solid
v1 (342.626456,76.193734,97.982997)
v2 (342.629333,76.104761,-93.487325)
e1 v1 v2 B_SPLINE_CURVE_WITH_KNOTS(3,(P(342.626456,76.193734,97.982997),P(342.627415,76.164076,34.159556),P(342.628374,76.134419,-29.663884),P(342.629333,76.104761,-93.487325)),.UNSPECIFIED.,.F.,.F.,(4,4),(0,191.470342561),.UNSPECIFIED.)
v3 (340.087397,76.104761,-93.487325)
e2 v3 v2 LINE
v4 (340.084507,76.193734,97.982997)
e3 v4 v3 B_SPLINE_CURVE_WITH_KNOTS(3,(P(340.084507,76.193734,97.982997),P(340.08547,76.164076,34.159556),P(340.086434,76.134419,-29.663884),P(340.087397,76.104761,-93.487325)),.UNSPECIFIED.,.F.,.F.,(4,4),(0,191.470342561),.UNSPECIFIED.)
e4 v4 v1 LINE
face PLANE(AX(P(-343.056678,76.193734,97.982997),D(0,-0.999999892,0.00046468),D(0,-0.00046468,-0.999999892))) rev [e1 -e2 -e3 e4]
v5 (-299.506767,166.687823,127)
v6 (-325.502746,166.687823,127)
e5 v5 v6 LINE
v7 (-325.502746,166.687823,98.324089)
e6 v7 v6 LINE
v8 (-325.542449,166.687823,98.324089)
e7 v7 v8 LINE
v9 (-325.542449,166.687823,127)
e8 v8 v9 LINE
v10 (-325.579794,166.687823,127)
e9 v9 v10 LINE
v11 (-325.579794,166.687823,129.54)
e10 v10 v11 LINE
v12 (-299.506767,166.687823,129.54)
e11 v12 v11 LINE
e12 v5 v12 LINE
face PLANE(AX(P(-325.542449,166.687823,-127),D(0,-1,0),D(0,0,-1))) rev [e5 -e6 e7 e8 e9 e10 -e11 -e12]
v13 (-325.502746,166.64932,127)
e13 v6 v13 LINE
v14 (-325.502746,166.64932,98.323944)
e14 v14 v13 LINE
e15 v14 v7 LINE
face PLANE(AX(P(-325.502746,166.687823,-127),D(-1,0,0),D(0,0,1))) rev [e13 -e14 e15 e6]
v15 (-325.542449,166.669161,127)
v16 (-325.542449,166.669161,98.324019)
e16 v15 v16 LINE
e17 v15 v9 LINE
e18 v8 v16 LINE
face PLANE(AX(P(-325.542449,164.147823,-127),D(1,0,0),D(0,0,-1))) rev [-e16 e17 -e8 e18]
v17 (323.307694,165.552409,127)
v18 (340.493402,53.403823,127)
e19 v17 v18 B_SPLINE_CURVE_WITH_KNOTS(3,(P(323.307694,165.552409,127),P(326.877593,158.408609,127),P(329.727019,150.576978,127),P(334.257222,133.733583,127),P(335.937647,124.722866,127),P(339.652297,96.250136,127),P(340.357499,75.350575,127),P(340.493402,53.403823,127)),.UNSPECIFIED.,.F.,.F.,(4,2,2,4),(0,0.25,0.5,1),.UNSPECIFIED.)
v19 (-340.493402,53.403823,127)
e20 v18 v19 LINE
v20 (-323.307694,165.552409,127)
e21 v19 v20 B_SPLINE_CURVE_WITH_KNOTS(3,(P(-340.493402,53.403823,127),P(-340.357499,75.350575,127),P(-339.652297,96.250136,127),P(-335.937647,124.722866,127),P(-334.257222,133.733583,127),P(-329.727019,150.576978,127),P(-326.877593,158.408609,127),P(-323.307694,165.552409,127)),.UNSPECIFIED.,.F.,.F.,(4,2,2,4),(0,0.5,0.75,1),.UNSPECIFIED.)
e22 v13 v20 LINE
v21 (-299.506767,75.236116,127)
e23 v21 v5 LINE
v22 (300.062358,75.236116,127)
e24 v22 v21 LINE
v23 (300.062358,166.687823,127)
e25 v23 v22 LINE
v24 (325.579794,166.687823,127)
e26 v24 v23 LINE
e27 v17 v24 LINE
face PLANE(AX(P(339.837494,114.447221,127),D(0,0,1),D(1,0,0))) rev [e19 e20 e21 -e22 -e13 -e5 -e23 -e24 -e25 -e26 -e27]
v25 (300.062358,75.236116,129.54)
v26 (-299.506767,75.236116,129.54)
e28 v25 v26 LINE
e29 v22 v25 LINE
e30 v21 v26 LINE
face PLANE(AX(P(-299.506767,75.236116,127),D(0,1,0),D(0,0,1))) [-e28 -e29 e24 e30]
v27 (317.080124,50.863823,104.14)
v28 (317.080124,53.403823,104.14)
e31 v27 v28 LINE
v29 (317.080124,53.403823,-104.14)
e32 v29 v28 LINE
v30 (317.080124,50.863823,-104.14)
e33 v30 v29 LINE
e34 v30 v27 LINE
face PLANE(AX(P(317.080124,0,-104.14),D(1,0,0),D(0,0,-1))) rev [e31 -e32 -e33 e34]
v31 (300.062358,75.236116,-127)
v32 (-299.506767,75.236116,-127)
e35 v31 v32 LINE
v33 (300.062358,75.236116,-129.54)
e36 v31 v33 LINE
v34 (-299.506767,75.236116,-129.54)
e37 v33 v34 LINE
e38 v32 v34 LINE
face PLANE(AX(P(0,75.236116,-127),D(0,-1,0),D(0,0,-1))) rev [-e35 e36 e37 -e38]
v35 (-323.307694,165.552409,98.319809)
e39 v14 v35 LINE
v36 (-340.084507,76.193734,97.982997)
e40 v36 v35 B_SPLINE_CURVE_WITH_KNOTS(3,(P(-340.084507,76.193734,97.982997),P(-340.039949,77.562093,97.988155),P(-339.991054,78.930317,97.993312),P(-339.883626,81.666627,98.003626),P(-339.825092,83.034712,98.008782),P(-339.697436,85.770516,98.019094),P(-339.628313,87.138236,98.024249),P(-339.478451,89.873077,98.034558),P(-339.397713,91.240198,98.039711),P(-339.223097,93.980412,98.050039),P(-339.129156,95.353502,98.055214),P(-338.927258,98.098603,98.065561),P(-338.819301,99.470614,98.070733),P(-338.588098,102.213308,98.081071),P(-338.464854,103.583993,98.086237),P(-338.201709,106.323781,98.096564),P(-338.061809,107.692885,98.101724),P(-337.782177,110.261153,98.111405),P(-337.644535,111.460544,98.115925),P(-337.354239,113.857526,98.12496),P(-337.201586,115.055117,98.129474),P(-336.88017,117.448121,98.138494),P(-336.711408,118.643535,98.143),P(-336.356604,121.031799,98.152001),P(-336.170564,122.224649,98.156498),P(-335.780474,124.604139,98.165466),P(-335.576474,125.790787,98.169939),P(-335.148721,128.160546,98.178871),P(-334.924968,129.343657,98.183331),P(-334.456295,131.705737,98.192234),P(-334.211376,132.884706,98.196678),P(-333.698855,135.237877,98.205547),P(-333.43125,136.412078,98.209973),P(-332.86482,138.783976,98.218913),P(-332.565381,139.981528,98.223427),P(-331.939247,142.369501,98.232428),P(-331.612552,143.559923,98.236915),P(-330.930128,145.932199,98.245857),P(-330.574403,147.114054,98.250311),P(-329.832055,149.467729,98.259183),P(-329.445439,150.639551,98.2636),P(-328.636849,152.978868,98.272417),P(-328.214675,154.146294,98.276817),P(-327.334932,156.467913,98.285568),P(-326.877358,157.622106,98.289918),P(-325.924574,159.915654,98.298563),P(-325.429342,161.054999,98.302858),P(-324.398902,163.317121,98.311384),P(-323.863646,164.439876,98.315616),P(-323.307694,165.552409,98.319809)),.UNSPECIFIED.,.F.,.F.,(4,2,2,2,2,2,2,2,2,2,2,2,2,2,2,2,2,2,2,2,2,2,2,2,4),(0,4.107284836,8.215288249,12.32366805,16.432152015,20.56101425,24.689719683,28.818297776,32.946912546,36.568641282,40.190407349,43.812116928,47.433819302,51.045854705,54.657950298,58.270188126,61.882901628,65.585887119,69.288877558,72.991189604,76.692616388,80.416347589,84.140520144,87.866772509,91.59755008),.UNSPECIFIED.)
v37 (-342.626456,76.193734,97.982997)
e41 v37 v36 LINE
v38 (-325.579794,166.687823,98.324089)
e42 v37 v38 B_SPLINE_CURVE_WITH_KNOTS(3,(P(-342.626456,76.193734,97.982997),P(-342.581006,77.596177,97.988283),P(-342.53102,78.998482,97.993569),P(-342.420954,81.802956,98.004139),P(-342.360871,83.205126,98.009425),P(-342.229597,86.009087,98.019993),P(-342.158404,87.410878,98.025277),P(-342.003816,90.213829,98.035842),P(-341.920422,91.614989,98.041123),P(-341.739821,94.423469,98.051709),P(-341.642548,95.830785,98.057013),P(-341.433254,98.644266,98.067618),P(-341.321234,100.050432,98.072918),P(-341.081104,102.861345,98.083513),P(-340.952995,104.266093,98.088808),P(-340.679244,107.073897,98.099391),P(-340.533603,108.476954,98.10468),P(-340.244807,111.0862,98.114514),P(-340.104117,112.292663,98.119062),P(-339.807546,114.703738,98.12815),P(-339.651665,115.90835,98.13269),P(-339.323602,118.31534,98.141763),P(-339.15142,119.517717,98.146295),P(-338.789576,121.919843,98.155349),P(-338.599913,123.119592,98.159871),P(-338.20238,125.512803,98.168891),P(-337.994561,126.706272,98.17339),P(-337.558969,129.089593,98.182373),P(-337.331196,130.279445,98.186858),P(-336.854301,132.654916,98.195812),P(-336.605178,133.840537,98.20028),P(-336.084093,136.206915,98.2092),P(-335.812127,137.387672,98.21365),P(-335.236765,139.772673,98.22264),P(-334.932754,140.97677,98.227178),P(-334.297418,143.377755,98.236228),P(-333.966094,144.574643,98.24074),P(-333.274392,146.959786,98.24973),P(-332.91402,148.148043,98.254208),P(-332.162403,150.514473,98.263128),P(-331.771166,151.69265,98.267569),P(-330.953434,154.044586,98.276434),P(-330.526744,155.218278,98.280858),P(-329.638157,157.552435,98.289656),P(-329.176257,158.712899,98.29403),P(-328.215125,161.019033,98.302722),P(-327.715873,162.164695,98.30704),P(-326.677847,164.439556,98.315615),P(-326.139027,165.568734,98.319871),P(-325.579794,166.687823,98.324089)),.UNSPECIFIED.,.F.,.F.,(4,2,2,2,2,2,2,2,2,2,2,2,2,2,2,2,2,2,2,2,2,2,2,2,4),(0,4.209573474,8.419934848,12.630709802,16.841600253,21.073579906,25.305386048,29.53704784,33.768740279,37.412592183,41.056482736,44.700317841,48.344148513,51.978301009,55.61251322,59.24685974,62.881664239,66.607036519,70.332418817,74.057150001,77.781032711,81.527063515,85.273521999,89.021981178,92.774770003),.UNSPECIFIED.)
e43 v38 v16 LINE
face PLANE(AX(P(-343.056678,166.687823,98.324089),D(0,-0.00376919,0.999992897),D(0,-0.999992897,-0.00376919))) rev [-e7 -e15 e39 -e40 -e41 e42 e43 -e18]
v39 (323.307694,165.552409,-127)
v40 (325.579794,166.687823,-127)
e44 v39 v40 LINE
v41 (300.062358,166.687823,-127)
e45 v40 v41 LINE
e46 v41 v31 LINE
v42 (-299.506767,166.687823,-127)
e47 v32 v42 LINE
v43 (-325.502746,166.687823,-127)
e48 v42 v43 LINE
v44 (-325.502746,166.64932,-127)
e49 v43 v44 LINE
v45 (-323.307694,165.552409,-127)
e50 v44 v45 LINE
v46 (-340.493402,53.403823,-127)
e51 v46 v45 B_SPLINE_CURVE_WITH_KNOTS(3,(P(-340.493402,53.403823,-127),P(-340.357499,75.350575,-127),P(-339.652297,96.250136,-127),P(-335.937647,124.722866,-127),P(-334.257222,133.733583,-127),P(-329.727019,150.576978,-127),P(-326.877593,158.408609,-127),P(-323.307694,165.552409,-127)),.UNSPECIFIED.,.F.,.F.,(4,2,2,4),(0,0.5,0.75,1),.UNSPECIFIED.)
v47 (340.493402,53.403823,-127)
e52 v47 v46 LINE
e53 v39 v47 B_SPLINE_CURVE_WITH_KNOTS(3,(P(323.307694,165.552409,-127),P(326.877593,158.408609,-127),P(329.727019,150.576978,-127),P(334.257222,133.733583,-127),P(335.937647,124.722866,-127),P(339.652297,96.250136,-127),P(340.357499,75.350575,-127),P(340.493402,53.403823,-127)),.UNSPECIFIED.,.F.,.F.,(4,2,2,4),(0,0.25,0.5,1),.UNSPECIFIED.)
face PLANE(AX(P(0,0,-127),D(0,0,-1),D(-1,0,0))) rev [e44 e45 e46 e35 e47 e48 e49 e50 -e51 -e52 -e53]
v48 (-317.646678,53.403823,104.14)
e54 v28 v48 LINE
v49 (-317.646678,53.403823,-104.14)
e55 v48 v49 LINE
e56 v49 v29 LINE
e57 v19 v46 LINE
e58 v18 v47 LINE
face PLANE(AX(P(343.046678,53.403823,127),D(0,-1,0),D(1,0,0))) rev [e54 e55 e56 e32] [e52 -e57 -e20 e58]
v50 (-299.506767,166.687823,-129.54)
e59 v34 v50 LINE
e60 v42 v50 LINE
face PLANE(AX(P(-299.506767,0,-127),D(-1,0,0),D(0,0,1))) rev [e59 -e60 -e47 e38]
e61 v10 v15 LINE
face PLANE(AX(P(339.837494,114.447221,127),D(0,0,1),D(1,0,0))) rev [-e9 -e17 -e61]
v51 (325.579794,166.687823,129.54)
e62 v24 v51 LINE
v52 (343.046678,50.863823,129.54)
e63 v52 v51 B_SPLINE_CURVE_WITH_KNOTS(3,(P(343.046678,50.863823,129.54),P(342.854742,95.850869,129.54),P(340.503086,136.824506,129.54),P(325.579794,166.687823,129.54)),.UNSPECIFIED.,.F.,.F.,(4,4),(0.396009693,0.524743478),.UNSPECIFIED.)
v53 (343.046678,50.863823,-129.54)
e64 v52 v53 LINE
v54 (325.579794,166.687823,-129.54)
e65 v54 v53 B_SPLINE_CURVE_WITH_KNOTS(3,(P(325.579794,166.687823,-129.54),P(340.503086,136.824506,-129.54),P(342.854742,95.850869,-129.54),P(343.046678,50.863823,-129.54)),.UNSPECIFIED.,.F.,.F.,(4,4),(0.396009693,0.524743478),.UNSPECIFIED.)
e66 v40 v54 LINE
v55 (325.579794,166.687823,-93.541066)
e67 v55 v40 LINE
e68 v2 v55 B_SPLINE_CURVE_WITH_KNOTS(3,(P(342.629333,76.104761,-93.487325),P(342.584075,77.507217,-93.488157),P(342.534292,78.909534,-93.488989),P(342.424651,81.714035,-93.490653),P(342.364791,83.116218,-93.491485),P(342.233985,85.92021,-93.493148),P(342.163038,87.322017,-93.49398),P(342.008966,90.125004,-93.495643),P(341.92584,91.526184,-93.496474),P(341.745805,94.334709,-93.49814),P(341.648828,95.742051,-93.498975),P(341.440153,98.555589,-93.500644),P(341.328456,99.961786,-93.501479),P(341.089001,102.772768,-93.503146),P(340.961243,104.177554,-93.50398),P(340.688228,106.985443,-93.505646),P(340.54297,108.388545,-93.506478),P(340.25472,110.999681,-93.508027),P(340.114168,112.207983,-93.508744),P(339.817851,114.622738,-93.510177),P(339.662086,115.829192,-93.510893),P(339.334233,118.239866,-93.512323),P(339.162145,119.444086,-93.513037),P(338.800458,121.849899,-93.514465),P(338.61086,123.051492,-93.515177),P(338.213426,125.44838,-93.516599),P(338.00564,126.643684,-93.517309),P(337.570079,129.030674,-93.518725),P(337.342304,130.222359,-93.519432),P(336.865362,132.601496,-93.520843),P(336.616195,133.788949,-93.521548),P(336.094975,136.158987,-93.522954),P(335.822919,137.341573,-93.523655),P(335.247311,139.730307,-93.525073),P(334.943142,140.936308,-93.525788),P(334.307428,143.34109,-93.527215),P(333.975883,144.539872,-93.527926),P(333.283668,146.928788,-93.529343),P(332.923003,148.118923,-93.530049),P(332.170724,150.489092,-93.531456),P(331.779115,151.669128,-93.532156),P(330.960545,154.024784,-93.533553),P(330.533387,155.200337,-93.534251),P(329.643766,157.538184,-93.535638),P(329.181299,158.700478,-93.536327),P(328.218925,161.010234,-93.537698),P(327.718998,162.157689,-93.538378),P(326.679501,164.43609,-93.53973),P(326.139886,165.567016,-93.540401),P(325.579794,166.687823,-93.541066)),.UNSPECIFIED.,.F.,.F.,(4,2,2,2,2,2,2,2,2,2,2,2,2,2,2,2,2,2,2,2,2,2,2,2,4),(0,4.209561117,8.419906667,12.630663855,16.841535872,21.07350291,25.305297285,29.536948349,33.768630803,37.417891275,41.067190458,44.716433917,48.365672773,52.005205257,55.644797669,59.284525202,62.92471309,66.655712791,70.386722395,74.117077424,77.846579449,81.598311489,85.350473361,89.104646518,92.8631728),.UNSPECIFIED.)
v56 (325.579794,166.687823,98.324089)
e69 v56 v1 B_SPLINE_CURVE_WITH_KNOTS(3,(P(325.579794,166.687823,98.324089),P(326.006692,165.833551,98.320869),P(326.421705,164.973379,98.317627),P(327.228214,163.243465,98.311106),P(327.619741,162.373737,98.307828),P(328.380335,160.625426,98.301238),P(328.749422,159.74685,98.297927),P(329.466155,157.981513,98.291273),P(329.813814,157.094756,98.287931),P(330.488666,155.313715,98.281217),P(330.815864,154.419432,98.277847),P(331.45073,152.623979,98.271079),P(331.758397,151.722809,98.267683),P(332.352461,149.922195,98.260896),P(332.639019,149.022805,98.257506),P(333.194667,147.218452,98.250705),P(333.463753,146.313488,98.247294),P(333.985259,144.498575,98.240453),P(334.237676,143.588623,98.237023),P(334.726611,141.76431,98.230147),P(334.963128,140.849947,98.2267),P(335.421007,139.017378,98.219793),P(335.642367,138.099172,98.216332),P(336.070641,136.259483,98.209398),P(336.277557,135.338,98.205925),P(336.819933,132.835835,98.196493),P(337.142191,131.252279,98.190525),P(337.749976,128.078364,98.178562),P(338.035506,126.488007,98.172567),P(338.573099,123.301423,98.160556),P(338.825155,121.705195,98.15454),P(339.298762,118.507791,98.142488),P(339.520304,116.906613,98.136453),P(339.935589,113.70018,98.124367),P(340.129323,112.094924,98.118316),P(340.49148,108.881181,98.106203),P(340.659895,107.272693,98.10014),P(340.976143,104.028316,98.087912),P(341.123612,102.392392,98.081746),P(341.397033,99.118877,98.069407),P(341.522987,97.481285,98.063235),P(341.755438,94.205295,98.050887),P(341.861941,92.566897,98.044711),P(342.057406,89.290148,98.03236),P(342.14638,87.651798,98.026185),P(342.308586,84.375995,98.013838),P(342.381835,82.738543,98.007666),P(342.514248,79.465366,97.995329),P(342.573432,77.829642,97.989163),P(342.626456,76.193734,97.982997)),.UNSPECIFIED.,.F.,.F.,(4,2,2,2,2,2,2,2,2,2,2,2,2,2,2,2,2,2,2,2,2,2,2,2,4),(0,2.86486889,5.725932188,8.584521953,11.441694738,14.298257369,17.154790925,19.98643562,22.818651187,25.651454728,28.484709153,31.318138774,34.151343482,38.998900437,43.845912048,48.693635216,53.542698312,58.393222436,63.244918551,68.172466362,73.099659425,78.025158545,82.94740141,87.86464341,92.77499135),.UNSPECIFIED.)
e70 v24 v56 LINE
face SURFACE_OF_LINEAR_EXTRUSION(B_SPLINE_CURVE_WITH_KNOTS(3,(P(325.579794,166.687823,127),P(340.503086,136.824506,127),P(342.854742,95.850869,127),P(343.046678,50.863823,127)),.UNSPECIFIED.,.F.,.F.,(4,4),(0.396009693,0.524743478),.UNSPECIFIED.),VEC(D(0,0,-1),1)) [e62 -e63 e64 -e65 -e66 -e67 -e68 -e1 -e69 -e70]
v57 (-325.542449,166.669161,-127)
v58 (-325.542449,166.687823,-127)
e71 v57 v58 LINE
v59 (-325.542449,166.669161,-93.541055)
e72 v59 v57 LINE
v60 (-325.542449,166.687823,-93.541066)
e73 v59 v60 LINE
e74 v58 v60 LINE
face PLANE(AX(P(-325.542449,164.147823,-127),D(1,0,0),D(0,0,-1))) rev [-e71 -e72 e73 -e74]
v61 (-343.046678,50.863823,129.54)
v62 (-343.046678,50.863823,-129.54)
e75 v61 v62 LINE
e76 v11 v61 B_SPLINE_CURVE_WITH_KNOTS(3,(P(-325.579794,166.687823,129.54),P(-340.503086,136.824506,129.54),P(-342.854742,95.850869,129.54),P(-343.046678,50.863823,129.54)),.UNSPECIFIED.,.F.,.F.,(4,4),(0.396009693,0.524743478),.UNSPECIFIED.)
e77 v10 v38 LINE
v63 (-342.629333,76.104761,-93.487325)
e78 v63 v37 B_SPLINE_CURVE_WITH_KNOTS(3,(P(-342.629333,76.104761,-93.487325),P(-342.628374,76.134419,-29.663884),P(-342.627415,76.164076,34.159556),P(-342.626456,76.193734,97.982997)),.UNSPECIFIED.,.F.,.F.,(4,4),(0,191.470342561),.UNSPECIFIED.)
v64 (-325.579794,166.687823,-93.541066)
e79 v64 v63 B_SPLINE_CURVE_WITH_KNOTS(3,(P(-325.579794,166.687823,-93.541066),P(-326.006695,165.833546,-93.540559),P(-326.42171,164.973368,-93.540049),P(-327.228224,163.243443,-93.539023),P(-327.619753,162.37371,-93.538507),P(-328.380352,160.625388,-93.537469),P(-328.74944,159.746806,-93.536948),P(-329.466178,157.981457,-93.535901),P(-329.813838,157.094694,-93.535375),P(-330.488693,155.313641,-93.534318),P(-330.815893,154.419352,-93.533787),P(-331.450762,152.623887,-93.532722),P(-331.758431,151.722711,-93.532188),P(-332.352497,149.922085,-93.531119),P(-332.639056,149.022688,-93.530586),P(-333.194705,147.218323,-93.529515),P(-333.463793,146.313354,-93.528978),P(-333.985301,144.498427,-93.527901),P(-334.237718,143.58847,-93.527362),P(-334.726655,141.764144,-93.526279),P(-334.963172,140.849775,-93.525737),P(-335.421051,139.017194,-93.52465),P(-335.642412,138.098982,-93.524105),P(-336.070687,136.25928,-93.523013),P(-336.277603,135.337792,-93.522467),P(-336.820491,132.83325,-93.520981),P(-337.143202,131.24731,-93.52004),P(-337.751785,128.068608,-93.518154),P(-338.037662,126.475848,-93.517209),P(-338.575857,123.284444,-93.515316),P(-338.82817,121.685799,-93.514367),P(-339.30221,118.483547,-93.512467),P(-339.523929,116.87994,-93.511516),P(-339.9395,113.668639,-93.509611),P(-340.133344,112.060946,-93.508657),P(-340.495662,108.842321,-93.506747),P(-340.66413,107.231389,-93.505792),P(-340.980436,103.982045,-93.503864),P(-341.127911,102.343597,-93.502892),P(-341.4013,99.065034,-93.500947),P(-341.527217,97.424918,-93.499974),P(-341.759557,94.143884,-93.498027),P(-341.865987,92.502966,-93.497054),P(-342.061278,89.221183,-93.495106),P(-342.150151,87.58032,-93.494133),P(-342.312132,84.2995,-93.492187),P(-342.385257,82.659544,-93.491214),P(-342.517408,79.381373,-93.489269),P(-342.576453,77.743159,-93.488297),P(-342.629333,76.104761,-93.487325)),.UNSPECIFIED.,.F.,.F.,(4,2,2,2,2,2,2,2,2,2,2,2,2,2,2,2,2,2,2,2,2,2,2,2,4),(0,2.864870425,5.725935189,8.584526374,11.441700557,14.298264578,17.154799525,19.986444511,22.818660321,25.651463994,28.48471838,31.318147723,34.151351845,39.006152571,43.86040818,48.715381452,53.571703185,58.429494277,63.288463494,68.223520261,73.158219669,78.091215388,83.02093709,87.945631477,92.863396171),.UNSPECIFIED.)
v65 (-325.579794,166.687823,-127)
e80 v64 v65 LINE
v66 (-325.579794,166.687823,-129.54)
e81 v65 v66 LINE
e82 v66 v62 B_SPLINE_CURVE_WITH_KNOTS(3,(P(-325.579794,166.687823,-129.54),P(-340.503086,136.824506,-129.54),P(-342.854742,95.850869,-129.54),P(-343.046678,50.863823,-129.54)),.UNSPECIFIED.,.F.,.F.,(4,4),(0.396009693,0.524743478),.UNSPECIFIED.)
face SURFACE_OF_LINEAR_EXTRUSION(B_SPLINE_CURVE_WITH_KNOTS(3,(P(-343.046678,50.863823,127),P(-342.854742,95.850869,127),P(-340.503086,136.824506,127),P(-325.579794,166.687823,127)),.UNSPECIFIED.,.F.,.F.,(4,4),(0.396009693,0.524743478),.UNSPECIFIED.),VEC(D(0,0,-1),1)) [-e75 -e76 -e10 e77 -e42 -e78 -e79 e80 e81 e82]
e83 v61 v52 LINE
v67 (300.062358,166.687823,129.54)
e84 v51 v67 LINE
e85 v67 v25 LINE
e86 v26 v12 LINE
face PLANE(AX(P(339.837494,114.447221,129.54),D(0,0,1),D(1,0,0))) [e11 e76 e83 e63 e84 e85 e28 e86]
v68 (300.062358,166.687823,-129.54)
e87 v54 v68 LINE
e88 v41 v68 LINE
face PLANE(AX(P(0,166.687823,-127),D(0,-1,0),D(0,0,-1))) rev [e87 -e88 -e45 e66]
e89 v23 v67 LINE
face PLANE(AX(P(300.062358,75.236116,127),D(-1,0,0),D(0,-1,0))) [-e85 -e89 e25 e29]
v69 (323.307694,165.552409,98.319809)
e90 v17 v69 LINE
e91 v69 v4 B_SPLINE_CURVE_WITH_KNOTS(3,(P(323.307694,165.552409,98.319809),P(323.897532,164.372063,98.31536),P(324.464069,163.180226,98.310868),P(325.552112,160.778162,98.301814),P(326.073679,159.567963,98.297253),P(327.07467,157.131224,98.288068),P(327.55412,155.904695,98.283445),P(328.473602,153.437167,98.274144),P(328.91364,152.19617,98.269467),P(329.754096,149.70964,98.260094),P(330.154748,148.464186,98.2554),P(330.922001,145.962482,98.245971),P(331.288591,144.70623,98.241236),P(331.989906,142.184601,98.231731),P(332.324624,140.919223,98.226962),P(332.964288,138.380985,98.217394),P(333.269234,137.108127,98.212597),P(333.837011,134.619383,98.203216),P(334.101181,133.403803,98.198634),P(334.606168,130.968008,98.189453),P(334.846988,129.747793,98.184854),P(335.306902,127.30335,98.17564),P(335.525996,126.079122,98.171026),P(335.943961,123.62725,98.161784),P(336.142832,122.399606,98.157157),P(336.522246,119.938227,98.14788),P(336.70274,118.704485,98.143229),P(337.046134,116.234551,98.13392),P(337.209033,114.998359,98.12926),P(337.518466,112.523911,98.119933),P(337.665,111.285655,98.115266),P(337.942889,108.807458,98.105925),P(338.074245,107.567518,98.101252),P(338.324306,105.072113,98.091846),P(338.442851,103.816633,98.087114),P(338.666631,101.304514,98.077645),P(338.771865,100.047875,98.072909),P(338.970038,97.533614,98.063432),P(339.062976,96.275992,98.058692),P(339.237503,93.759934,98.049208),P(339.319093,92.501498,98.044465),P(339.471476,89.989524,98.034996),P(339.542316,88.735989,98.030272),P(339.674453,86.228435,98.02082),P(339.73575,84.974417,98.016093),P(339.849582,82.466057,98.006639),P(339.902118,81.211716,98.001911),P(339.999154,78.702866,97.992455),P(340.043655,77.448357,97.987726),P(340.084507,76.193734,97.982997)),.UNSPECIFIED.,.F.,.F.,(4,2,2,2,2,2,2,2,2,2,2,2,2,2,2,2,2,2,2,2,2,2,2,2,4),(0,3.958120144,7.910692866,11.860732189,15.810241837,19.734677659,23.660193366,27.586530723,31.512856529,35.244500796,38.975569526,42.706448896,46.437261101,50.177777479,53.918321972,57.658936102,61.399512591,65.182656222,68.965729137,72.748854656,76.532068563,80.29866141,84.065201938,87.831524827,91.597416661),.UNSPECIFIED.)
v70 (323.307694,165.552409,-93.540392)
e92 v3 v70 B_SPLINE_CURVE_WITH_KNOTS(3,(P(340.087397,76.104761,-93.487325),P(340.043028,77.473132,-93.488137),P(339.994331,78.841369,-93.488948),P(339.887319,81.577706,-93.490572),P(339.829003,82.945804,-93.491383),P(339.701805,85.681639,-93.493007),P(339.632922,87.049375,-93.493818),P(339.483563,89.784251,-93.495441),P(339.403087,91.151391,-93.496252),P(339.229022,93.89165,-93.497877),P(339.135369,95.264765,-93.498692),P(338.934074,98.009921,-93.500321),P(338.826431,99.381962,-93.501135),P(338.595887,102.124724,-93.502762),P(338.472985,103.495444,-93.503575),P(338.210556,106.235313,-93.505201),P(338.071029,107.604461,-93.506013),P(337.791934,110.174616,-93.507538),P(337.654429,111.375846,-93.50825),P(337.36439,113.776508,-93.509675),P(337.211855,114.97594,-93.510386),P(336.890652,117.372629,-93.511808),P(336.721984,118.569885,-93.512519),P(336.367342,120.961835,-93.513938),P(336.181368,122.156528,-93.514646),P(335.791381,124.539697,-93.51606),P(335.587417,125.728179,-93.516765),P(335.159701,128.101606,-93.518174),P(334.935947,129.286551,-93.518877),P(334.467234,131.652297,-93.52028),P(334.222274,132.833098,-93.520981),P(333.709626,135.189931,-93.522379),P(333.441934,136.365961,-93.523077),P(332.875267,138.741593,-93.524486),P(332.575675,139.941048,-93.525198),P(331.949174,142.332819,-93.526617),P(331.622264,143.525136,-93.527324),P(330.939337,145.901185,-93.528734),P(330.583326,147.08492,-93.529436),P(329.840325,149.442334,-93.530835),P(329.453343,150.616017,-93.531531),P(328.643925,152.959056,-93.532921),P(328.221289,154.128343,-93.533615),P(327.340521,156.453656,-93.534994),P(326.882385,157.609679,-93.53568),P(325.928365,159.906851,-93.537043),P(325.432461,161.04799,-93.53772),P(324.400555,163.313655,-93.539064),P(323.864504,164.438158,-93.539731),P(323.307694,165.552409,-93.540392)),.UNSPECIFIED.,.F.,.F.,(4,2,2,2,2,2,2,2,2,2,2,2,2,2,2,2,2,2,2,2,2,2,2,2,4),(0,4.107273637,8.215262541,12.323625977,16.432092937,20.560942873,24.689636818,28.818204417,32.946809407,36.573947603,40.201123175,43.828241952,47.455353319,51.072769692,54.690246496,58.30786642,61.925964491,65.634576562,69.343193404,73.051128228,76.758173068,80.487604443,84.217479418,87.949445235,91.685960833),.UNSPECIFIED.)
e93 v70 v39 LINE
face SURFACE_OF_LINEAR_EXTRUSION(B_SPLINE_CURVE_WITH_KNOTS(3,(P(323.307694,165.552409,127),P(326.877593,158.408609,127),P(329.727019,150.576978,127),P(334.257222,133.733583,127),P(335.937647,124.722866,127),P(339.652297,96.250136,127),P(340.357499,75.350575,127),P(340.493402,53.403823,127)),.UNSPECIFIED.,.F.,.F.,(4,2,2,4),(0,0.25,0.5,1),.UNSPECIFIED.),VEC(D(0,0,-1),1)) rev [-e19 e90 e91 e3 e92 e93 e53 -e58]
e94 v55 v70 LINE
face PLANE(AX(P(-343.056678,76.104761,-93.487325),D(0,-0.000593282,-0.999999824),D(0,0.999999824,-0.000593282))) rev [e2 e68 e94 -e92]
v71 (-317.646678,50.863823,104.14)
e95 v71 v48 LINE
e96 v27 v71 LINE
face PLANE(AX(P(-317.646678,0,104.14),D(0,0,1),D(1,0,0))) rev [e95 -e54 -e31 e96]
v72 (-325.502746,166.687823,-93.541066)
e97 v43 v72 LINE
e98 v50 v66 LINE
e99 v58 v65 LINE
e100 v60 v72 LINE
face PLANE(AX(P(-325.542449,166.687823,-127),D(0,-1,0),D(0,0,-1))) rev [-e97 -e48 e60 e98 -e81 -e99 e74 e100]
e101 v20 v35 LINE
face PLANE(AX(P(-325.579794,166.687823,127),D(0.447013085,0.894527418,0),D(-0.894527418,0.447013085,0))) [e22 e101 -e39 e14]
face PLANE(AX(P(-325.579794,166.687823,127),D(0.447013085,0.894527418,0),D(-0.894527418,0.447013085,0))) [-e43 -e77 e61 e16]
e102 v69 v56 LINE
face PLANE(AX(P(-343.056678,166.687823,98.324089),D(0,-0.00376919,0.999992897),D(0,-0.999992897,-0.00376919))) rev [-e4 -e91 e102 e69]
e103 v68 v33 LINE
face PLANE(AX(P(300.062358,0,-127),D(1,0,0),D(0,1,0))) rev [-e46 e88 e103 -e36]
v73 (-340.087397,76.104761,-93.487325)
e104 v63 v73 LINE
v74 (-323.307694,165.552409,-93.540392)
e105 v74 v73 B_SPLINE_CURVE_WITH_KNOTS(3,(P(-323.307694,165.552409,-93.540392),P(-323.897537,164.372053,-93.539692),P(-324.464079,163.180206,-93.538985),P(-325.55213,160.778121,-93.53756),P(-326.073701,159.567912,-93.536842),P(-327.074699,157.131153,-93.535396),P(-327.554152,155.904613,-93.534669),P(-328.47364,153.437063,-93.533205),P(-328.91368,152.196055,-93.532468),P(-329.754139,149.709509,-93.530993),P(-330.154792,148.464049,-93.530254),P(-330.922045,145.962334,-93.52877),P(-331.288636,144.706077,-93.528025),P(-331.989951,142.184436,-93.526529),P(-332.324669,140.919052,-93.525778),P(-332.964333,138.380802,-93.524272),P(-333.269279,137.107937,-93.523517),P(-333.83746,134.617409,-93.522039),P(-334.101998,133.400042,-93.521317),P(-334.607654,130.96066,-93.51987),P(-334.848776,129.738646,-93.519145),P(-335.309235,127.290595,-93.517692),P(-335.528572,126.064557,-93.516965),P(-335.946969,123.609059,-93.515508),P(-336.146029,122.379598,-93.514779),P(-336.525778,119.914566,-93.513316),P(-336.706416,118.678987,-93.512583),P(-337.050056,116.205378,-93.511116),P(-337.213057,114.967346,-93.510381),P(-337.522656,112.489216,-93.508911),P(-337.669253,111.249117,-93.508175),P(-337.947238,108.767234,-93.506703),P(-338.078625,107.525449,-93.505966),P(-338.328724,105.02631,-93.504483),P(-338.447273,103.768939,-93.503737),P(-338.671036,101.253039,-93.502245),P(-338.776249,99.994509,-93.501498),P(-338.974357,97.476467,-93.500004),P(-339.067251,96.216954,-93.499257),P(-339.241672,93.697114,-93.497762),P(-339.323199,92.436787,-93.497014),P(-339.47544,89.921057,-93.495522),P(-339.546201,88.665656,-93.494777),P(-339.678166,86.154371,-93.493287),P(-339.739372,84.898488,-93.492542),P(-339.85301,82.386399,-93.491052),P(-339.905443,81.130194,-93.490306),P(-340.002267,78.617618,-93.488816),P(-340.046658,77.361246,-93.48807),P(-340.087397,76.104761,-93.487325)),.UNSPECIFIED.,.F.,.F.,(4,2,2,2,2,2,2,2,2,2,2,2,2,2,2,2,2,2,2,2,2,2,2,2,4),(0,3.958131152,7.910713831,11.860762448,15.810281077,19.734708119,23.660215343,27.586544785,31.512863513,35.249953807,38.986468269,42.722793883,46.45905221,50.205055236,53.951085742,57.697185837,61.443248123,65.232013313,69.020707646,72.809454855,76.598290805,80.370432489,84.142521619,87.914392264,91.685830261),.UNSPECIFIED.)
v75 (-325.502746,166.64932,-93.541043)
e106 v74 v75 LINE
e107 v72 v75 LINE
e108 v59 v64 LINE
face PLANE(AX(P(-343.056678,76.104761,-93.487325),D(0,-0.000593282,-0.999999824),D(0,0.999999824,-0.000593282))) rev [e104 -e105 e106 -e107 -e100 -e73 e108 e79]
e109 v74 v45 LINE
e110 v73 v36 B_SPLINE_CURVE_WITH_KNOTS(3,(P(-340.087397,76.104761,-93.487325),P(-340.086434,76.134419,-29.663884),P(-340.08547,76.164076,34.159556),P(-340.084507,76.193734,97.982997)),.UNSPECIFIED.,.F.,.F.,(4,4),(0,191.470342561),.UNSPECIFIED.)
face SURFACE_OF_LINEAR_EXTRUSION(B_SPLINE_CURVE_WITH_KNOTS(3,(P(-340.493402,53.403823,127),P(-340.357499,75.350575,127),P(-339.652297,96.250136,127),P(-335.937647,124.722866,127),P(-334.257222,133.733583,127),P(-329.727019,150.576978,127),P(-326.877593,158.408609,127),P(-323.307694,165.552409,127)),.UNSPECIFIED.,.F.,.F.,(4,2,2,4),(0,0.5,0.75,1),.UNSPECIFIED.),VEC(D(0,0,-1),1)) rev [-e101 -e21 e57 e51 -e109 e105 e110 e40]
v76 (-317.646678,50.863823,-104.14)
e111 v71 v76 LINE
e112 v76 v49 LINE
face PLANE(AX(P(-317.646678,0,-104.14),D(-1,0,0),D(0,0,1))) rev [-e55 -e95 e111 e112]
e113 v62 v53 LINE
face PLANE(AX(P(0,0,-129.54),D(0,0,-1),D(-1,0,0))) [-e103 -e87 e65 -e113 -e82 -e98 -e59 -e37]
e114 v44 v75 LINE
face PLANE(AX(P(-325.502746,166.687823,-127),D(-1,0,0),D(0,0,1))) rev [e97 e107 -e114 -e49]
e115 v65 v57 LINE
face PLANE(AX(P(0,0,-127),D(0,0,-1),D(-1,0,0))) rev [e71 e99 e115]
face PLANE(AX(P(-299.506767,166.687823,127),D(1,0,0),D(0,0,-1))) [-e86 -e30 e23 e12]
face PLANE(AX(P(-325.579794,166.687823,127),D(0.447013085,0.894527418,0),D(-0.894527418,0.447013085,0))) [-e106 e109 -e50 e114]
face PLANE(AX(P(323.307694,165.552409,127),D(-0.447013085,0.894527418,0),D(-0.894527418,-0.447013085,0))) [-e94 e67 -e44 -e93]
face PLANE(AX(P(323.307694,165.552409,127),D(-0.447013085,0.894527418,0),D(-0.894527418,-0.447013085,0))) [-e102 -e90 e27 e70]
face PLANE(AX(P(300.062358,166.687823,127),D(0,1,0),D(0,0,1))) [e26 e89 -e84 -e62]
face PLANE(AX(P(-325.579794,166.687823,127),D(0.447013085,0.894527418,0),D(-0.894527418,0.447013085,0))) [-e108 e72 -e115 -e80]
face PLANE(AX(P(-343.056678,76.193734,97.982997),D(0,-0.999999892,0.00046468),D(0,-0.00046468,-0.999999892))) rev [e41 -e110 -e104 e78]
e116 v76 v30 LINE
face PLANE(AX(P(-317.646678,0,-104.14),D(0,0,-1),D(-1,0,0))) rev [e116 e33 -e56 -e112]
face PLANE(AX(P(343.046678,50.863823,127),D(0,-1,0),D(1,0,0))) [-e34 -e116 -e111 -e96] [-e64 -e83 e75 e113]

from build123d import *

# Parameters (mm, degrees)
EXTRUDE_THIN2_START    = -127
EXTRUDE_THIN2_DEPTH    = 254
SPLIT1_SURFACE_1_BACK  = 741.713
SPLIT1_SURFACE_1_DEPTH = 1483.426
BOSS_EXTRUDE2_DEPTH    = 2.54
BOSS_EXTRUDE3_DEPTH    = 2.54
SPLIT2_SURFACE_2_BACK  = 743.47
SPLIT2_SURFACE_2_DEPTH = 1486.94


# Read off the part's stored shape, not the designer's step: Extrude-Thin2
with BuildPart() as part:
    # Extrude-Thin2 outline → Extrude-Thin2 (new body)
    with BuildSketch(Plane.XY.offset(EXTRUDE_THIN2_START)):
        with BuildLine():
            Line((-325.542449195, 166.687822519), (-325.542449195, 166.669160537))
            Line((-325.542449195, 166.669160537), (-325.579794085, 166.687822519))
            add(Edge.make_bspline(
                [(-343.046678298, 50.863822519), (-342.854742326, 95.850869045), (-340.503085509, 136.824505781), (-325.579794085, 166.687822519)],
                knots=[0.396009693, 0.396009693, 0.396009693, 0.396009693, 0.524743478, 0.524743478, 0.524743478, 0.524743478], degree=3))
            Line((-343.046678298, 50.863822519), (343.046678298, 50.863822519))
            add(Edge.make_bspline(
                [(325.579794084, 166.687822519), (340.503085509, 136.824505781), (342.854742326, 95.850869045), (343.046678298, 50.863822519)],
                knots=[0.396009693, 0.396009693, 0.396009693, 0.396009693, 0.524743478, 0.524743478, 0.524743478, 0.524743478], degree=3))
            Line((325.579794084, 166.687822519), (323.307694442, 165.552409283))
            add(Edge.make_bspline(
                [(323.307694442, 165.552409283), (326.877593275, 158.408608594), (329.727019011, 150.576977672), (334.257221566, 133.733582984), (335.93764666, 124.722865717), (339.652297398, 96.250136339), (340.357498858, 75.350575466), (340.493401884, 53.403822519)],
                knots=[0, 0, 0, 0, 0.25, 0.25, 0.5, 0.5, 1, 1, 1, 1], degree=3))
            Line((340.493401884, 53.403822519), (-340.493401884, 53.403822519))
            add(Edge.make_bspline(
                [(-340.493401884, 53.403822519), (-340.357498858, 75.350575466), (-339.652297398, 96.250136339), (-335.937646661, 124.722865717), (-334.257221567, 133.733582984), (-329.727019012, 150.576977672), (-326.877593276, 158.408608594), (-323.307694443, 165.552409283)],
                knots=[0, 0, 0, 0, 0.5, 0.5, 0.75, 0.75, 1, 1, 1, 1], degree=3))
            Line((-323.307694443, 165.552409283), (-325.502746425, 166.649320276))
            Line((-325.502746425, 166.649320276), (-325.502746425, 166.687822519))
            Line((-325.502746425, 166.687822519), (-325.542449195, 166.687822519))
        make_face()
    extrude(amount=EXTRUDE_THIN2_DEPTH)

    # Split1: cut with a surface, the side behind it stays
    # Split1 surface: a surface, the sketch's curves swept straight by 1483.426 mm
    with BuildLine(Plane(origin=(0, 0, 0), x_dir=(0, 0, -1), z_dir=(1, 0, 0)).offset(-SPLIT1_SURFACE_1_BACK), mode=Mode.PRIVATE) as split1_surface_1_path:
        Line((-98.324088945, 166.687822519), (-97.98299712, 76.193733858))
        Line((-97.98299712, 76.193733858), (93.487324748, 76.104761498))
        Line((93.487324748, 76.104761498), (93.541066072, 166.687822519))
        Line((93.541066072, 166.687822519), (-98.324088945, 166.687822519))
    split1_surface_1 = Shell.extrude(split1_surface_1_path.wire(), (1 * SPLIT1_SURFACE_1_DEPTH, 0 * SPLIT1_SURFACE_1_DEPTH, 0 * SPLIT1_SURFACE_1_DEPTH))
    split(bisect_by=split1_surface_1, keep=Keep.BOTTOM)

    # Sketch6 → Boss-Extrude2 (add)
    with BuildSketch(Plane.XY.offset(129.54)):
        with BuildLine():
            Line((343.046678298, 50.863822519), (-343.046678298, 50.863822519))
            add(Edge.make_bspline(
                [(-325.579794085, 166.687822519), (-340.503085509, 136.824505781), (-342.854742326, 95.850869045), (-343.046678298, 50.863822519)],
                knots=[0.396009693, 0.396009693, 0.396009693, 0.396009693, 0.524743478, 0.524743478, 0.524743478, 0.524743478], degree=3))
            Line((-325.579794085, 166.687822519), (-325.542449195, 166.687822519))
            Line((-325.542449195, 166.687822519), (-299.506767133, 166.687822519))
            Line((-299.506767133, 166.687822519), (-299.506767133, 75.23611572))
            Line((-299.506767133, 75.23611572), (300.062358087, 75.23611572))
            Line((300.062358087, 75.23611572), (300.062358087, 166.687822519))
            Line((300.062358087, 166.687822519), (325.579794084, 166.687822519))
            add(Edge.make_bspline(
                [(325.579794084, 166.687822519), (340.503085509, 136.824505781), (342.854742326, 95.850869045), (343.046678298, 50.863822519)],
                knots=[0.396009693, 0.396009693, 0.396009693, 0.396009693, 0.524743478, 0.524743478, 0.524743478, 0.524743478], degree=3))
        make_face()
    extrude(amount=-BOSS_EXTRUDE2_DEPTH)

    # Sketch7 → Boss-Extrude3 (add)
    with BuildSketch(Plane(origin=(0, 0, -129.54), x_dir=(-1, 0, 0), z_dir=(0, 0, -1))):
        with BuildLine():
            Line((0, 50.863822519), (0, 75.23611572))
            Line((0, 75.23611572), (-300.062358087, 75.23611572))
            Line((-300.062358087, 75.23611572), (-300.062358087, 166.687822519))
            Line((-300.062358087, 166.687822519), (-325.502746425, 166.687822519))
            Line((-325.502746425, 166.687822519), (-325.542449195, 166.687822519))
            Line((-325.542449195, 166.687822519), (-325.579794085, 166.687822519))
            add(Edge.make_bspline(
                [(-325.579794085, 166.687822519), (-340.503085509, 136.824505781), (-342.854742326, 95.850869045), (-343.046678298, 50.863822519)],
                knots=[0.396009693, 0.396009693, 0.396009693, 0.396009693, 0.524743478, 0.524743478, 0.524743478, 0.524743478], degree=3))
            Line((-343.046678298, 50.863822519), (0, 50.863822519))
        make_face()
        with BuildLine():
            Line((299.506767133, 75.23611572), (0, 75.23611572))
            Line((0, 75.23611572), (0, 50.863822519))
            Line((0, 50.863822519), (343.046678298, 50.863822519))
            add(Edge.make_bspline(
                [(325.579794084, 166.687822519), (340.503085509, 136.824505781), (342.854742326, 95.850869045), (343.046678298, 50.863822519)],
                knots=[0.396009693, 0.396009693, 0.396009693, 0.396009693, 0.524743478, 0.524743478, 0.524743478, 0.524743478], degree=3))
            Line((325.579794084, 166.687822519), (299.506767133, 166.687822519))
            Line((299.506767133, 166.687822519), (299.506767133, 75.23611572))
        make_face()
    extrude(amount=-BOSS_EXTRUDE3_DEPTH)

    # Split2: cut with a surface, the side it looks to stays
    # Split2 surface: a surface, the sketch's curves swept straight by 1486.94 mm
    with BuildLine(Plane(origin=(0, 0, 0), x_dir=(1, 0, 0), z_dir=(0, 1, 0)).offset(-SPLIT2_SURFACE_2_BACK), mode=Mode.PRIVATE) as split2_surface_2_path:
        Line((-317.646678298, 104.14), (317.080123639, 104.14))
        Line((317.080123639, 104.14), (317.080123639, -104.14))
        Line((317.080123639, -104.14), (-317.646678298, -104.14))
        Line((-317.646678298, -104.14), (-317.646678298, 104.14))
    split2_surface_2 = Shell.extrude(split2_surface_2_path.wire(), (0 * SPLIT2_SURFACE_2_DEPTH, 1 * SPLIT2_SURFACE_2_DEPTH, 0 * SPLIT2_SURFACE_2_DEPTH))
    split(bisect_by=split2_surface_2, keep=Keep.TOP)


solid = part.part
